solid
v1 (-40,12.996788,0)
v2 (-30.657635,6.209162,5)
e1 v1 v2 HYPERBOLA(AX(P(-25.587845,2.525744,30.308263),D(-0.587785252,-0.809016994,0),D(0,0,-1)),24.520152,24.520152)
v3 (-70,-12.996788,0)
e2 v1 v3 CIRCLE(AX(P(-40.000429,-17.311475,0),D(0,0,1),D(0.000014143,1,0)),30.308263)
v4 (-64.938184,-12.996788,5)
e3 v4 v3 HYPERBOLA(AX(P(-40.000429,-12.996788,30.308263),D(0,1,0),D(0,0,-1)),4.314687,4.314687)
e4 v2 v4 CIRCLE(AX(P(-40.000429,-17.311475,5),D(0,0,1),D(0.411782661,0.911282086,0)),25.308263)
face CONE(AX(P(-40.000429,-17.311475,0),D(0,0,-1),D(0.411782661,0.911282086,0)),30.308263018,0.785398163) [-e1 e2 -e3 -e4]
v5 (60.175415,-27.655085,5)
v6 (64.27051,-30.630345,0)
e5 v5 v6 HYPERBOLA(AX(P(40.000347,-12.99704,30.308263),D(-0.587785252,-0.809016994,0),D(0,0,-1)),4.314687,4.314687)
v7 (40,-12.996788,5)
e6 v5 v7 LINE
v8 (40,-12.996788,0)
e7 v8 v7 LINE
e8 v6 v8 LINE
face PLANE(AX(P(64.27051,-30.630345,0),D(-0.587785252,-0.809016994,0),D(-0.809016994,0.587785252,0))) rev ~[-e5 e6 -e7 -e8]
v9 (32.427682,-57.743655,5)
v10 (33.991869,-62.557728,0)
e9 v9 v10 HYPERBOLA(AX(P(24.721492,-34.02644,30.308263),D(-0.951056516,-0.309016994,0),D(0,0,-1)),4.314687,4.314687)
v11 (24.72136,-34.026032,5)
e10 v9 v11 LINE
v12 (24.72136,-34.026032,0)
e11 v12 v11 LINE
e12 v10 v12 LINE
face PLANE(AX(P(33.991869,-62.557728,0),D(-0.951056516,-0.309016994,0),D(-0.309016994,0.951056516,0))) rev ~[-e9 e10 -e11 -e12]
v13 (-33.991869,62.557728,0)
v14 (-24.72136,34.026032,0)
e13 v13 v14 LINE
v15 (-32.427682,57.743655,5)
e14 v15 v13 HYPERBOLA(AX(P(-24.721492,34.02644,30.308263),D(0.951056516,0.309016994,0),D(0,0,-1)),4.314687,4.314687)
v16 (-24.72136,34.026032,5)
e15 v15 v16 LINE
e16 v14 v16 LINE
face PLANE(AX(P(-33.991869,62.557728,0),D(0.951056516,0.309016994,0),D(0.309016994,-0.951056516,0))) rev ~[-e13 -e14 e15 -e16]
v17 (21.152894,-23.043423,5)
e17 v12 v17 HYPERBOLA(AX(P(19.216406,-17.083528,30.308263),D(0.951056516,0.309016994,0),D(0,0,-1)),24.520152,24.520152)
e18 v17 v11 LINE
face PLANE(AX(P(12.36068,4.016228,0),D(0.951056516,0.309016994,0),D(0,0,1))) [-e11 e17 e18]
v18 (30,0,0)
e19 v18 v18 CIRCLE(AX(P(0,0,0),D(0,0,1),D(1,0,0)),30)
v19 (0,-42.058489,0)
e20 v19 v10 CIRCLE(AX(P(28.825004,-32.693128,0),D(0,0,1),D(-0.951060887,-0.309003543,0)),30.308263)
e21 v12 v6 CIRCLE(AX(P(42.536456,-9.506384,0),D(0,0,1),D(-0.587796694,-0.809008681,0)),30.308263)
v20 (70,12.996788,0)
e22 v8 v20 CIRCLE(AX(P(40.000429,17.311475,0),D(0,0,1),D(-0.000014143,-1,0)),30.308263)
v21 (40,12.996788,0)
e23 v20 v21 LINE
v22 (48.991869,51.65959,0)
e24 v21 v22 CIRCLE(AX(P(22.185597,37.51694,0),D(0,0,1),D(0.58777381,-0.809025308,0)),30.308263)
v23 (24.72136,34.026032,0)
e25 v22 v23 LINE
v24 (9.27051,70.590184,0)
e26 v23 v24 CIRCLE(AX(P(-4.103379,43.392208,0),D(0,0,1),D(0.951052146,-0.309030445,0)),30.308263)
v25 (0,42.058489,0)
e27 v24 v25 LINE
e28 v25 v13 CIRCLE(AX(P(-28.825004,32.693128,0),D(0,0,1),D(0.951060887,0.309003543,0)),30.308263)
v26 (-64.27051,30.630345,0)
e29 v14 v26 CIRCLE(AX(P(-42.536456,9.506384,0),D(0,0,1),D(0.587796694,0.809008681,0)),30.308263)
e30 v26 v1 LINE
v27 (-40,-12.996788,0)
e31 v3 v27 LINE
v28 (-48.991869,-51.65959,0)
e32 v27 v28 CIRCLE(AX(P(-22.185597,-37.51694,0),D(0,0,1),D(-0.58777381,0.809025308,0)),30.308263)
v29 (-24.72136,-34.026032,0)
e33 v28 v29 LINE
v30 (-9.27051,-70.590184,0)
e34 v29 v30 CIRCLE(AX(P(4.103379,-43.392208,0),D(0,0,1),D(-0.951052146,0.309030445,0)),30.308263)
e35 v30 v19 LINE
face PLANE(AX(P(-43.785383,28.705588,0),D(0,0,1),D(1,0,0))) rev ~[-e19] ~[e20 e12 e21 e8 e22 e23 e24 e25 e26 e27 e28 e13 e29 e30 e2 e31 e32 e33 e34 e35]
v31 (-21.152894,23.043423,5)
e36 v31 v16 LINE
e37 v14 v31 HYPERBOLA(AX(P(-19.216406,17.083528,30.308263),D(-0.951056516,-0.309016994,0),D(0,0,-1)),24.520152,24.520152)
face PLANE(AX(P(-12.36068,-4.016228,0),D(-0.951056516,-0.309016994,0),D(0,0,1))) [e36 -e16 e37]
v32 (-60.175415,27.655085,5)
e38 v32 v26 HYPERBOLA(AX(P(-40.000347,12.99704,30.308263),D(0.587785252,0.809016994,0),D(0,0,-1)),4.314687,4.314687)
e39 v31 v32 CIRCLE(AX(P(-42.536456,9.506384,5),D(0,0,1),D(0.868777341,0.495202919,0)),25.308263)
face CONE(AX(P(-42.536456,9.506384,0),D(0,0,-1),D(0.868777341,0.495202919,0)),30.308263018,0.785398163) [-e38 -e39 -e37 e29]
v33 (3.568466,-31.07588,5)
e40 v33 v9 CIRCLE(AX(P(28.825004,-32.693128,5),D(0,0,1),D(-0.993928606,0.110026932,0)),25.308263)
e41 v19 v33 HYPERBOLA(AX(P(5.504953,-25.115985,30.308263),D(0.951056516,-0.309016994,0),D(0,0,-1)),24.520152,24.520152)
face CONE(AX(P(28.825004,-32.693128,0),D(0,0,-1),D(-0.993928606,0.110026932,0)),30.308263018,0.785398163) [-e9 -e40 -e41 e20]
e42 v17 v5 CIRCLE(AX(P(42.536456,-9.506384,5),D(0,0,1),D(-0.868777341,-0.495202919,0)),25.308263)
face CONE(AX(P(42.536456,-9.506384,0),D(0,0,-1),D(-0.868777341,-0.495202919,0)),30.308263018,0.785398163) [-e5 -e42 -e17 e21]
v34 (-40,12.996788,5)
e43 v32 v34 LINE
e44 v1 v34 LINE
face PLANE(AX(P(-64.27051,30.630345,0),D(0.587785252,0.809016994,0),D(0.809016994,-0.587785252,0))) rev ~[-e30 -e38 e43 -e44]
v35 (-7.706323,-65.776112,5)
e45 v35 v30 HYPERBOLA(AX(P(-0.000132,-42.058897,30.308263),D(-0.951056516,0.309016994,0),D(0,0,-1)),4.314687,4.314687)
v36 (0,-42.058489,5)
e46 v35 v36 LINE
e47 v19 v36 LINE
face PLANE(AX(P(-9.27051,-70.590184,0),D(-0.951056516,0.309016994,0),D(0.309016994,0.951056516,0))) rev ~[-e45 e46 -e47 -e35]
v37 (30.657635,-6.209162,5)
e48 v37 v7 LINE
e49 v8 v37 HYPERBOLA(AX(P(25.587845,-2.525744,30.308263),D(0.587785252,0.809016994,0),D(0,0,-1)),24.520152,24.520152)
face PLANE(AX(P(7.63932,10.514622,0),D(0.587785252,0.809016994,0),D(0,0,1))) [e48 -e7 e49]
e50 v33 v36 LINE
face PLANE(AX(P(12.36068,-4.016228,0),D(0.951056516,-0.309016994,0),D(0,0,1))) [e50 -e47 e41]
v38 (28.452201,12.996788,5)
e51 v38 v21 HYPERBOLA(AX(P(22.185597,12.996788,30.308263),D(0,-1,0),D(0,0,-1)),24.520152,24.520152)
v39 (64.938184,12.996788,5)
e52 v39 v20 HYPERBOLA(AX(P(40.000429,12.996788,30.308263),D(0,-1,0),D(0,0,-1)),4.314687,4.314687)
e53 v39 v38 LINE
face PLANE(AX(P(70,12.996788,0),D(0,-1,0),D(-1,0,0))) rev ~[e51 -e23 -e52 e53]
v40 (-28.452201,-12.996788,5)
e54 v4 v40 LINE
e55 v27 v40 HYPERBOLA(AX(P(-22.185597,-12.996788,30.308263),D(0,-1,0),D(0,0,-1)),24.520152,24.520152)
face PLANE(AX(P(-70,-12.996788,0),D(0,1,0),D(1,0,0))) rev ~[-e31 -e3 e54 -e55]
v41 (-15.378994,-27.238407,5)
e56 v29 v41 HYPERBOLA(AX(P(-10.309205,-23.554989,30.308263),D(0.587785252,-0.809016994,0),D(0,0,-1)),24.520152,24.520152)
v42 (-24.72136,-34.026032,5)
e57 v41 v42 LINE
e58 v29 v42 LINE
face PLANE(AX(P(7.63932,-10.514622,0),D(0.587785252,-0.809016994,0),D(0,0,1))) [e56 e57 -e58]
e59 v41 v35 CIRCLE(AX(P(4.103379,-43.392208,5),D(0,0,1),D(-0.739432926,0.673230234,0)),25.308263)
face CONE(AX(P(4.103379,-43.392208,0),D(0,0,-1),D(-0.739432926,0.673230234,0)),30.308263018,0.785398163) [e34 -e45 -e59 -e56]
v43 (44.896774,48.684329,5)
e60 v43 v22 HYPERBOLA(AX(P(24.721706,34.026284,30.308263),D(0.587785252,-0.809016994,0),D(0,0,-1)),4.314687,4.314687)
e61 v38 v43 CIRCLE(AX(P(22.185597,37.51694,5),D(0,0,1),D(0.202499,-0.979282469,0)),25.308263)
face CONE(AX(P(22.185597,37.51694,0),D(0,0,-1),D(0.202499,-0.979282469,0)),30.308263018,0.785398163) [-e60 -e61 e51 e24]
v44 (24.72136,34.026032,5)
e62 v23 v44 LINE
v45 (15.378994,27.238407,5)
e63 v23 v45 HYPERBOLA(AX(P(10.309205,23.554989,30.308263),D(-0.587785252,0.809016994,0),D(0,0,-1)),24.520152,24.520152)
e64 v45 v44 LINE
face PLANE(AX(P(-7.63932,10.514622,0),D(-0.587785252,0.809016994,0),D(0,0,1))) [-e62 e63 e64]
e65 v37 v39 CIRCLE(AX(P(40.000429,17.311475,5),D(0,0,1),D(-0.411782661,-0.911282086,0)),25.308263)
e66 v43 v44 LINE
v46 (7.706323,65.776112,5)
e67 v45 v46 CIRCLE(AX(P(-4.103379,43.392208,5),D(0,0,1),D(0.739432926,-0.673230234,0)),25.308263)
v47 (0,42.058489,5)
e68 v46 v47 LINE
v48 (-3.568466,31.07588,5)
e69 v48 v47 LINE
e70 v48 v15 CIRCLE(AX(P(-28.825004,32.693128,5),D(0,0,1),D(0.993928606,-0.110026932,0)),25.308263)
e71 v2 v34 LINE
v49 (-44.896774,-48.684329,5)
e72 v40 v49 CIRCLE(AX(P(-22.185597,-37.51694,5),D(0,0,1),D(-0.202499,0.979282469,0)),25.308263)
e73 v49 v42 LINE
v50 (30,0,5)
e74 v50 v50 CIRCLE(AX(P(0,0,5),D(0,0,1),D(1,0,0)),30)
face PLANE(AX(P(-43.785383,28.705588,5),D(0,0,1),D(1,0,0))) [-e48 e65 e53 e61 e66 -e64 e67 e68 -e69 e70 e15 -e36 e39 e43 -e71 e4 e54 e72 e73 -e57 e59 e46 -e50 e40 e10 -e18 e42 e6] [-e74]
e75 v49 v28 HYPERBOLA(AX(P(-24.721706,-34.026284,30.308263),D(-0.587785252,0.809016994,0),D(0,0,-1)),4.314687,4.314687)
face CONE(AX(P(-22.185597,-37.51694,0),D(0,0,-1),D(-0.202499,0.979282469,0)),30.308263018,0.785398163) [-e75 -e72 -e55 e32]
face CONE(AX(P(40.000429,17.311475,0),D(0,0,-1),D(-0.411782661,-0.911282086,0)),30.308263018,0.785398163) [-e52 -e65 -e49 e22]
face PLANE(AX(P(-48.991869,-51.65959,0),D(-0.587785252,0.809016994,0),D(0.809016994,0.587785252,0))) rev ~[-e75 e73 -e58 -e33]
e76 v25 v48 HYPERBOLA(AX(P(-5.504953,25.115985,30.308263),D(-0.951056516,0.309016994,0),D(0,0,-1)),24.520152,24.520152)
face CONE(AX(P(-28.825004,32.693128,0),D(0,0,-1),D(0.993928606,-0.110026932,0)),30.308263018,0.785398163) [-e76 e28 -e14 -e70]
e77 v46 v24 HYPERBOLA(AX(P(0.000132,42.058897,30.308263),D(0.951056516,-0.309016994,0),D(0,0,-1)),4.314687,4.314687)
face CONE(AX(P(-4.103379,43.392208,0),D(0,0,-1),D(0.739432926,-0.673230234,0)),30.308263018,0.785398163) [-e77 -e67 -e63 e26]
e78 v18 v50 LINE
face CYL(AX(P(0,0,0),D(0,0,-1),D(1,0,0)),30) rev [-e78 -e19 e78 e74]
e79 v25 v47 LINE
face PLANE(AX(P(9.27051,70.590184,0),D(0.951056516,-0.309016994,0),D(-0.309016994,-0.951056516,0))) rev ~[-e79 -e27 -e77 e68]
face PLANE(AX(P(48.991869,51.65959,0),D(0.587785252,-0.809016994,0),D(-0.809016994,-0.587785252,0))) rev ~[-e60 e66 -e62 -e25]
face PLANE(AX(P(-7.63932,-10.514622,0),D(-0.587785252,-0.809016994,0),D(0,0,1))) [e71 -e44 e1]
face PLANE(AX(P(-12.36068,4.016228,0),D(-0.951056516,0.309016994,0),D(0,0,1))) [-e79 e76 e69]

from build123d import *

# Parameters (mm, degrees)
F0_R         = 30
F1_DEPTH     = 5
F2_T4_ANGLE  = 130.4484876855
F2_T9_ANGLE  = 130.4484876855
F2_T14_ANGLE = 130.4484876855
F2_T19_ANGLE = 130.4484876855
F2_T24_ANGLE = 130.4484876855
F2_T29_ANGLE = 130.4484876855
F2_T34_ANGLE = 130.4484876855
F2_T39_ANGLE = 130.4484876855
F2_T44_ANGLE = 130.4484876855
F2_T49_ANGLE = 130.4484876855


# Not quite as in the source:
# - a fillet or chamfer that OpenCascade refuses, or shapes differently, is made with other operations: its cross-section is extruded or revolved along the edge and cut away or added


with BuildPart() as f1:
    # F0 (on Top) → F1 (new body)
    with BuildSketch(Plane.XY):
        with BuildLine():
            Line((-40, 12.9967878493), (-24.72135955, 34.0260323341))
            ThreePointArc((-24.72135955, 34.0260323341), (-45.1291822893, 39.7035462239), (-64.2705098312, 30.6303454181))
            Line((-64.2705098312, 30.6303454181), (-40, 12.9967878493))
        make_face()
        Polygon((40, -12.9967878493), (40, 12.9967878493), (24.72135955, 34.0260323341), (0, 42.0584889695), (-24.72135955, 34.0260323341), (-40, 12.9967878493), (-40, -12.9967878493), (-24.72135955, -34.0260323341), (0, -42.0584889695), (24.72135955, -34.0260323341), align=None)
        Circle(F0_R, mode=Mode.SUBTRACT)
        with BuildLine():
            Line((-24.72135955, 34.0260323341), (0, 42.0584889695))
            ThreePointArc((0, 42.0584889695), (-13.1731164802, 58.6471114297), (-33.9918693812, 62.5577278229))
            Line((-33.9918693812, 62.5577278229), (-24.72135955, 34.0260323341))
        make_face()
        with BuildLine():
            Line((0, 42.0584889695), (24.72135955, 34.0260323341))
            ThreePointArc((24.72135955, 34.0260323341), (23.8146320866, 55.1894734115), (9.2705098312, 70.5901844584))
            Line((9.2705098312, 70.5901844584), (0, 42.0584889695))
        make_face()
        with BuildLine():
            Line((24.72135955, 34.0260323341), (40, 12.9967878493))
            ThreePointArc((40, 12.9967878493), (51.7060006259, 30.6513323712), (48.9918693812, 51.6595899029))
            Line((48.9918693812, 51.6595899029), (24.72135955, 34.0260323341))
        make_face()
        with BuildLine():
            Line((70, 12.9967878493), (40, 12.9967878493))
            Line((40, 12.9967878493), (40, -12.9967878493))
            ThreePointArc((40, -12.9967878493), (59.8474343484, -5.5945758344), (70, 12.9967878493))
        make_face()
        with BuildLine():
            Line((64.2705098312, -30.6303454181), (40, -12.9967878493))
            Line((40, -12.9967878493), (24.72135955, -34.0260323341))
            ThreePointArc((24.72135955, -34.0260323341), (45.1291822893, -39.7035462239), (64.2705098312, -30.6303454181))
        make_face()
        with BuildLine():
            Line((33.9918693812, -62.5577278229), (24.72135955, -34.0260323341))
            Line((24.72135955, -34.0260323341), (0, -42.0584889695))
            ThreePointArc((0, -42.0584889695), (13.1731164802, -58.6471114297), (33.9918693812, -62.5577278229))
        make_face()
        with BuildLine():
            Line((-9.2705098312, -70.5901844584), (0, -42.0584889695))
            Line((0, -42.0584889695), (-24.72135955, -34.0260323341))
            ThreePointArc((-24.72135955, -34.0260323341), (-23.8146320866, -55.1894734115), (-9.2705098312, -70.5901844584))
        make_face()
        with BuildLine():
            Line((-48.9918693812, -51.6595899029), (-24.72135955, -34.0260323341))
            Line((-24.72135955, -34.0260323341), (-40, -12.9967878493))
            ThreePointArc((-40, -12.9967878493), (-51.7060006259, -30.6513323712), (-48.9918693812, -51.6595899029))
        make_face()
        with BuildLine():
            Line((-40, -12.9967878493), (-40, 12.9967878493))
            ThreePointArc((-40, 12.9967878493), (-59.8474343484, 5.5945758344), (-70, -12.9967878493))
            Line((-70, -12.9967878493), (-40, -12.9967878493))
        make_face()
    extrude(amount=F1_DEPTH)

    # F2: chamfer of 5 on 10 edges, made by hand


with BuildPart() as f2_tool2:
    # F2_s3 → F2_t4 (revolve)
    with BuildSketch(Plane(origin=(-19.7412033785, -21.6824721062, 0), x_dir=(0, 0, 1), z_dir=(0.6732302342, 0.7394329258, 0))):
        Polygon((0, 1.9388571331), (5, 6.9388571331), (5, 1.9388571331), align=None)
    revolve(axis=Axis((4.103379024, -43.3922083566, 5), (0, 0, 1)), revolution_arc=F2_T4_ANGLE)

    split(bisect_by=Plane(origin=(7.639320225, -10.5146222424, 0), x_dir=(0, 0, 1), z_dir=(0.5877852523, -0.8090169944, 0)), keep=Keep.TOP)


with BuildPart() as f1_1:
    add(f1.part)

    # F2_t1: cut F2_tool2
    add(f2_tool2.part, mode=Mode.SUBTRACT)


with BuildPart() as f2_tool7:
    # F2_s8 → F2_t9 (revolve)
    with BuildSketch(Plane(origin=(-28.7156063599, -5.9379002056, 0), x_dir=(0, 0, 1), z_dir=(0.9792824694, 0.2024990002, 0))):
        Polygon((0, 1.9388571331), (5, 6.9388571331), (5, 1.9388571331), align=None)
    revolve(axis=Axis((-22.1855967717, -37.5169396588, 5), (0, 0, 1)), revolution_arc=F2_T9_ANGLE)

    split(bisect_by=Plane.XZ.offset(12.9967878493), keep=Keep.TOP)


with BuildPart() as f1_2:
    add(f1_1.part)

    # F2_t6: cut F2_tool7
    add(f2_tool7.part, mode=Mode.SUBTRACT)


with BuildPart() as f2_tool12:
    # F2_s13 → F2_t14 (revolve)
    with BuildSketch(Plane(origin=(-26.7216237194, 12.0747477518, 0), x_dir=(0, 0, 1), z_dir=(0.911282086, -0.4117826609, 0))):
        Polygon((0, 1.9388571331), (5, 6.9388571331), (5, 1.9388571331), align=None)
    revolve(axis=Axis((-40.0004286612, -17.3114751652, 5), (0, 0, 1)), revolution_arc=F2_T14_ANGLE)

    split(bisect_by=Plane(origin=(-7.639320225, -10.5146222424, 0), x_dir=(0, 0, 1), z_dir=(-0.5877852523, -0.8090169944, 0)), keep=Keep.TOP)


with BuildPart() as f1_3:
    add(f1_2.part)

    # F2_t11: cut F2_tool12
    add(f2_tool12.part, mode=Mode.SUBTRACT)


with BuildPart() as f2_tool17:
    # F2_s18 → F2_t19 (revolve)
    with BuildSketch(Plane(origin=(-14.5208890526, 25.4752524735, 0), x_dir=(0, 0, 1), z_dir=(0.495202919, -0.8687773415, 0))):
        Polygon((0, 1.9388571331), (5, 6.9388571331), (5, 1.9388571331), align=None)
    revolve(axis=Axis((-42.5364563668, 9.5063844461, 5), (0, 0, 1)), revolution_arc=F2_T19_ANGLE)

    split(bisect_by=Plane(origin=(-12.360679775, -4.0162283177, 0), x_dir=(0, 0, 1), z_dir=(-0.9510565163, -0.3090169944, 0)), keep=Keep.TOP)


with BuildPart() as f1_4:
    add(f1_3.part)

    # F2_t16: cut F2_tool17
    add(f2_tool17.part, mode=Mode.SUBTRACT)


with BuildPart() as f2_tool22:
    # F2_s23 → F2_t24 (revolve)
    with BuildSketch(Plane(origin=(3.2263316853, 29.1450766224, 0), x_dir=(0, 0, 1), z_dir=(-0.1100269317, -0.9939286062, 0))):
        Polygon((0, 1.9388571331), (5, 6.9388571331), (5, 1.9388571331), align=None)
    revolve(axis=Axis((-28.8250035012, 32.6931283091, 5), (0, 0, 1)), revolution_arc=F2_T24_ANGLE)

    split(bisect_by=Plane(origin=(-12.360679775, 4.0162283177, 0), x_dir=(0, 0, 1), z_dir=(-0.9510565163, 0.3090169944, 0)), keep=Keep.TOP)


with BuildPart() as f1_5:
    add(f1_4.part)

    # F2_t21: cut F2_tool22
    add(f2_tool22.part, mode=Mode.SUBTRACT)


with BuildPart() as f2_tool27:
    # F2_s28 → F2_t29 (revolve)
    with BuildSketch(Plane(origin=(19.7412033785, 21.6824721062, 0), x_dir=(0, 0, 1), z_dir=(-0.6732302342, -0.7394329258, 0))):
        Polygon((0, 1.9388571331), (5, 6.9388571331), (5, 1.9388571331), align=None)
    revolve(axis=Axis((-4.103379024, 43.3922083566, 5), (0, 0, 1)), revolution_arc=F2_T29_ANGLE)

    split(bisect_by=Plane(origin=(-7.639320225, 10.5146222424, 0), x_dir=(0, 0, 1), z_dir=(-0.5877852523, 0.8090169944, 0)), keep=Keep.TOP)


with BuildPart() as f1_6:
    add(f1_5.part)

    # F2_t26: cut F2_tool27
    add(f2_tool27.part, mode=Mode.SUBTRACT)


with BuildPart() as f2_tool32:
    # F2_s33 → F2_t34 (revolve)
    with BuildSketch(Plane(origin=(28.7156063599, 5.9379002056, 0), x_dir=(0, 0, 1), z_dir=(-0.9792824694, -0.2024990002, 0))):
        Polygon((0, 1.9388571331), (5, 6.9388571331), (5, 1.9388571331), align=None)
    revolve(axis=Axis((22.1855967717, 37.5169396588, 5), (0, 0, 1)), revolution_arc=F2_T34_ANGLE)

    split(bisect_by=Plane.XZ.offset(-12.9967878493), keep=Keep.BOTTOM)


with BuildPart() as f1_7:
    add(f1_6.part)

    # F2_t31: cut F2_tool32
    add(f2_tool32.part, mode=Mode.SUBTRACT)


with BuildPart() as f2_tool37:
    # F2_s38 → F2_t39 (revolve)
    with BuildSketch(Plane(origin=(26.7216237194, -12.0747477518, 0), x_dir=(0, 0, 1), z_dir=(-0.911282086, 0.4117826609, 0))):
        Polygon((0, 1.9388571331), (5, 6.9388571331), (5, 1.9388571331), align=None)
    revolve(axis=Axis((40.0004286612, 17.3114751652, 5), (0, 0, 1)), revolution_arc=F2_T39_ANGLE)

    split(bisect_by=Plane(origin=(7.639320225, 10.5146222424, 0), x_dir=(0, 0, 1), z_dir=(0.5877852523, 0.8090169944, 0)), keep=Keep.TOP)


with BuildPart() as f1_8:
    add(f1_7.part)

    # F2_t36: cut F2_tool37
    add(f2_tool37.part, mode=Mode.SUBTRACT)


with BuildPart() as f2_tool42:
    # F2_s43 → F2_t44 (revolve)
    with BuildSketch(Plane(origin=(14.5208890526, -25.4752524735, 0), x_dir=(0, 0, 1), z_dir=(-0.495202919, 0.8687773415, 0))):
        Polygon((0, 1.9388571331), (5, 6.9388571331), (5, 1.9388571331), align=None)
    revolve(axis=Axis((42.5364563668, -9.5063844461, 5), (0, 0, 1)), revolution_arc=F2_T44_ANGLE)

    split(bisect_by=Plane(origin=(12.360679775, 4.0162283177, 0), x_dir=(0, 0, 1), z_dir=(0.9510565163, 0.3090169944, 0)), keep=Keep.TOP)


with BuildPart() as f1_9:
    add(f1_8.part)

    # F2_t41: cut F2_tool42
    add(f2_tool42.part, mode=Mode.SUBTRACT)


with BuildPart() as f2_tool47:
    # F2_s48 → F2_t49 (revolve)
    with BuildSketch(Plane(origin=(-3.2263316853, -29.1450766224, 0), x_dir=(0, 0, 1), z_dir=(0.1100269317, 0.9939286062, 0))):
        Polygon((0, 1.9388571331), (5, 6.9388571331), (5, 1.9388571331), align=None)
    revolve(axis=Axis((28.8250035012, -32.6931283091, 5), (0, 0, 1)), revolution_arc=F2_T49_ANGLE)

    split(bisect_by=Plane(origin=(12.360679775, -4.0162283177, 0), x_dir=(0, 0, 1), z_dir=(0.9510565163, -0.3090169944, 0)), keep=Keep.TOP)


with BuildPart() as f1_10:
    add(f1_9.part)

    # F2_t46: cut F2_tool47
    add(f2_tool47.part, mode=Mode.SUBTRACT)


solid = f1_10.part
